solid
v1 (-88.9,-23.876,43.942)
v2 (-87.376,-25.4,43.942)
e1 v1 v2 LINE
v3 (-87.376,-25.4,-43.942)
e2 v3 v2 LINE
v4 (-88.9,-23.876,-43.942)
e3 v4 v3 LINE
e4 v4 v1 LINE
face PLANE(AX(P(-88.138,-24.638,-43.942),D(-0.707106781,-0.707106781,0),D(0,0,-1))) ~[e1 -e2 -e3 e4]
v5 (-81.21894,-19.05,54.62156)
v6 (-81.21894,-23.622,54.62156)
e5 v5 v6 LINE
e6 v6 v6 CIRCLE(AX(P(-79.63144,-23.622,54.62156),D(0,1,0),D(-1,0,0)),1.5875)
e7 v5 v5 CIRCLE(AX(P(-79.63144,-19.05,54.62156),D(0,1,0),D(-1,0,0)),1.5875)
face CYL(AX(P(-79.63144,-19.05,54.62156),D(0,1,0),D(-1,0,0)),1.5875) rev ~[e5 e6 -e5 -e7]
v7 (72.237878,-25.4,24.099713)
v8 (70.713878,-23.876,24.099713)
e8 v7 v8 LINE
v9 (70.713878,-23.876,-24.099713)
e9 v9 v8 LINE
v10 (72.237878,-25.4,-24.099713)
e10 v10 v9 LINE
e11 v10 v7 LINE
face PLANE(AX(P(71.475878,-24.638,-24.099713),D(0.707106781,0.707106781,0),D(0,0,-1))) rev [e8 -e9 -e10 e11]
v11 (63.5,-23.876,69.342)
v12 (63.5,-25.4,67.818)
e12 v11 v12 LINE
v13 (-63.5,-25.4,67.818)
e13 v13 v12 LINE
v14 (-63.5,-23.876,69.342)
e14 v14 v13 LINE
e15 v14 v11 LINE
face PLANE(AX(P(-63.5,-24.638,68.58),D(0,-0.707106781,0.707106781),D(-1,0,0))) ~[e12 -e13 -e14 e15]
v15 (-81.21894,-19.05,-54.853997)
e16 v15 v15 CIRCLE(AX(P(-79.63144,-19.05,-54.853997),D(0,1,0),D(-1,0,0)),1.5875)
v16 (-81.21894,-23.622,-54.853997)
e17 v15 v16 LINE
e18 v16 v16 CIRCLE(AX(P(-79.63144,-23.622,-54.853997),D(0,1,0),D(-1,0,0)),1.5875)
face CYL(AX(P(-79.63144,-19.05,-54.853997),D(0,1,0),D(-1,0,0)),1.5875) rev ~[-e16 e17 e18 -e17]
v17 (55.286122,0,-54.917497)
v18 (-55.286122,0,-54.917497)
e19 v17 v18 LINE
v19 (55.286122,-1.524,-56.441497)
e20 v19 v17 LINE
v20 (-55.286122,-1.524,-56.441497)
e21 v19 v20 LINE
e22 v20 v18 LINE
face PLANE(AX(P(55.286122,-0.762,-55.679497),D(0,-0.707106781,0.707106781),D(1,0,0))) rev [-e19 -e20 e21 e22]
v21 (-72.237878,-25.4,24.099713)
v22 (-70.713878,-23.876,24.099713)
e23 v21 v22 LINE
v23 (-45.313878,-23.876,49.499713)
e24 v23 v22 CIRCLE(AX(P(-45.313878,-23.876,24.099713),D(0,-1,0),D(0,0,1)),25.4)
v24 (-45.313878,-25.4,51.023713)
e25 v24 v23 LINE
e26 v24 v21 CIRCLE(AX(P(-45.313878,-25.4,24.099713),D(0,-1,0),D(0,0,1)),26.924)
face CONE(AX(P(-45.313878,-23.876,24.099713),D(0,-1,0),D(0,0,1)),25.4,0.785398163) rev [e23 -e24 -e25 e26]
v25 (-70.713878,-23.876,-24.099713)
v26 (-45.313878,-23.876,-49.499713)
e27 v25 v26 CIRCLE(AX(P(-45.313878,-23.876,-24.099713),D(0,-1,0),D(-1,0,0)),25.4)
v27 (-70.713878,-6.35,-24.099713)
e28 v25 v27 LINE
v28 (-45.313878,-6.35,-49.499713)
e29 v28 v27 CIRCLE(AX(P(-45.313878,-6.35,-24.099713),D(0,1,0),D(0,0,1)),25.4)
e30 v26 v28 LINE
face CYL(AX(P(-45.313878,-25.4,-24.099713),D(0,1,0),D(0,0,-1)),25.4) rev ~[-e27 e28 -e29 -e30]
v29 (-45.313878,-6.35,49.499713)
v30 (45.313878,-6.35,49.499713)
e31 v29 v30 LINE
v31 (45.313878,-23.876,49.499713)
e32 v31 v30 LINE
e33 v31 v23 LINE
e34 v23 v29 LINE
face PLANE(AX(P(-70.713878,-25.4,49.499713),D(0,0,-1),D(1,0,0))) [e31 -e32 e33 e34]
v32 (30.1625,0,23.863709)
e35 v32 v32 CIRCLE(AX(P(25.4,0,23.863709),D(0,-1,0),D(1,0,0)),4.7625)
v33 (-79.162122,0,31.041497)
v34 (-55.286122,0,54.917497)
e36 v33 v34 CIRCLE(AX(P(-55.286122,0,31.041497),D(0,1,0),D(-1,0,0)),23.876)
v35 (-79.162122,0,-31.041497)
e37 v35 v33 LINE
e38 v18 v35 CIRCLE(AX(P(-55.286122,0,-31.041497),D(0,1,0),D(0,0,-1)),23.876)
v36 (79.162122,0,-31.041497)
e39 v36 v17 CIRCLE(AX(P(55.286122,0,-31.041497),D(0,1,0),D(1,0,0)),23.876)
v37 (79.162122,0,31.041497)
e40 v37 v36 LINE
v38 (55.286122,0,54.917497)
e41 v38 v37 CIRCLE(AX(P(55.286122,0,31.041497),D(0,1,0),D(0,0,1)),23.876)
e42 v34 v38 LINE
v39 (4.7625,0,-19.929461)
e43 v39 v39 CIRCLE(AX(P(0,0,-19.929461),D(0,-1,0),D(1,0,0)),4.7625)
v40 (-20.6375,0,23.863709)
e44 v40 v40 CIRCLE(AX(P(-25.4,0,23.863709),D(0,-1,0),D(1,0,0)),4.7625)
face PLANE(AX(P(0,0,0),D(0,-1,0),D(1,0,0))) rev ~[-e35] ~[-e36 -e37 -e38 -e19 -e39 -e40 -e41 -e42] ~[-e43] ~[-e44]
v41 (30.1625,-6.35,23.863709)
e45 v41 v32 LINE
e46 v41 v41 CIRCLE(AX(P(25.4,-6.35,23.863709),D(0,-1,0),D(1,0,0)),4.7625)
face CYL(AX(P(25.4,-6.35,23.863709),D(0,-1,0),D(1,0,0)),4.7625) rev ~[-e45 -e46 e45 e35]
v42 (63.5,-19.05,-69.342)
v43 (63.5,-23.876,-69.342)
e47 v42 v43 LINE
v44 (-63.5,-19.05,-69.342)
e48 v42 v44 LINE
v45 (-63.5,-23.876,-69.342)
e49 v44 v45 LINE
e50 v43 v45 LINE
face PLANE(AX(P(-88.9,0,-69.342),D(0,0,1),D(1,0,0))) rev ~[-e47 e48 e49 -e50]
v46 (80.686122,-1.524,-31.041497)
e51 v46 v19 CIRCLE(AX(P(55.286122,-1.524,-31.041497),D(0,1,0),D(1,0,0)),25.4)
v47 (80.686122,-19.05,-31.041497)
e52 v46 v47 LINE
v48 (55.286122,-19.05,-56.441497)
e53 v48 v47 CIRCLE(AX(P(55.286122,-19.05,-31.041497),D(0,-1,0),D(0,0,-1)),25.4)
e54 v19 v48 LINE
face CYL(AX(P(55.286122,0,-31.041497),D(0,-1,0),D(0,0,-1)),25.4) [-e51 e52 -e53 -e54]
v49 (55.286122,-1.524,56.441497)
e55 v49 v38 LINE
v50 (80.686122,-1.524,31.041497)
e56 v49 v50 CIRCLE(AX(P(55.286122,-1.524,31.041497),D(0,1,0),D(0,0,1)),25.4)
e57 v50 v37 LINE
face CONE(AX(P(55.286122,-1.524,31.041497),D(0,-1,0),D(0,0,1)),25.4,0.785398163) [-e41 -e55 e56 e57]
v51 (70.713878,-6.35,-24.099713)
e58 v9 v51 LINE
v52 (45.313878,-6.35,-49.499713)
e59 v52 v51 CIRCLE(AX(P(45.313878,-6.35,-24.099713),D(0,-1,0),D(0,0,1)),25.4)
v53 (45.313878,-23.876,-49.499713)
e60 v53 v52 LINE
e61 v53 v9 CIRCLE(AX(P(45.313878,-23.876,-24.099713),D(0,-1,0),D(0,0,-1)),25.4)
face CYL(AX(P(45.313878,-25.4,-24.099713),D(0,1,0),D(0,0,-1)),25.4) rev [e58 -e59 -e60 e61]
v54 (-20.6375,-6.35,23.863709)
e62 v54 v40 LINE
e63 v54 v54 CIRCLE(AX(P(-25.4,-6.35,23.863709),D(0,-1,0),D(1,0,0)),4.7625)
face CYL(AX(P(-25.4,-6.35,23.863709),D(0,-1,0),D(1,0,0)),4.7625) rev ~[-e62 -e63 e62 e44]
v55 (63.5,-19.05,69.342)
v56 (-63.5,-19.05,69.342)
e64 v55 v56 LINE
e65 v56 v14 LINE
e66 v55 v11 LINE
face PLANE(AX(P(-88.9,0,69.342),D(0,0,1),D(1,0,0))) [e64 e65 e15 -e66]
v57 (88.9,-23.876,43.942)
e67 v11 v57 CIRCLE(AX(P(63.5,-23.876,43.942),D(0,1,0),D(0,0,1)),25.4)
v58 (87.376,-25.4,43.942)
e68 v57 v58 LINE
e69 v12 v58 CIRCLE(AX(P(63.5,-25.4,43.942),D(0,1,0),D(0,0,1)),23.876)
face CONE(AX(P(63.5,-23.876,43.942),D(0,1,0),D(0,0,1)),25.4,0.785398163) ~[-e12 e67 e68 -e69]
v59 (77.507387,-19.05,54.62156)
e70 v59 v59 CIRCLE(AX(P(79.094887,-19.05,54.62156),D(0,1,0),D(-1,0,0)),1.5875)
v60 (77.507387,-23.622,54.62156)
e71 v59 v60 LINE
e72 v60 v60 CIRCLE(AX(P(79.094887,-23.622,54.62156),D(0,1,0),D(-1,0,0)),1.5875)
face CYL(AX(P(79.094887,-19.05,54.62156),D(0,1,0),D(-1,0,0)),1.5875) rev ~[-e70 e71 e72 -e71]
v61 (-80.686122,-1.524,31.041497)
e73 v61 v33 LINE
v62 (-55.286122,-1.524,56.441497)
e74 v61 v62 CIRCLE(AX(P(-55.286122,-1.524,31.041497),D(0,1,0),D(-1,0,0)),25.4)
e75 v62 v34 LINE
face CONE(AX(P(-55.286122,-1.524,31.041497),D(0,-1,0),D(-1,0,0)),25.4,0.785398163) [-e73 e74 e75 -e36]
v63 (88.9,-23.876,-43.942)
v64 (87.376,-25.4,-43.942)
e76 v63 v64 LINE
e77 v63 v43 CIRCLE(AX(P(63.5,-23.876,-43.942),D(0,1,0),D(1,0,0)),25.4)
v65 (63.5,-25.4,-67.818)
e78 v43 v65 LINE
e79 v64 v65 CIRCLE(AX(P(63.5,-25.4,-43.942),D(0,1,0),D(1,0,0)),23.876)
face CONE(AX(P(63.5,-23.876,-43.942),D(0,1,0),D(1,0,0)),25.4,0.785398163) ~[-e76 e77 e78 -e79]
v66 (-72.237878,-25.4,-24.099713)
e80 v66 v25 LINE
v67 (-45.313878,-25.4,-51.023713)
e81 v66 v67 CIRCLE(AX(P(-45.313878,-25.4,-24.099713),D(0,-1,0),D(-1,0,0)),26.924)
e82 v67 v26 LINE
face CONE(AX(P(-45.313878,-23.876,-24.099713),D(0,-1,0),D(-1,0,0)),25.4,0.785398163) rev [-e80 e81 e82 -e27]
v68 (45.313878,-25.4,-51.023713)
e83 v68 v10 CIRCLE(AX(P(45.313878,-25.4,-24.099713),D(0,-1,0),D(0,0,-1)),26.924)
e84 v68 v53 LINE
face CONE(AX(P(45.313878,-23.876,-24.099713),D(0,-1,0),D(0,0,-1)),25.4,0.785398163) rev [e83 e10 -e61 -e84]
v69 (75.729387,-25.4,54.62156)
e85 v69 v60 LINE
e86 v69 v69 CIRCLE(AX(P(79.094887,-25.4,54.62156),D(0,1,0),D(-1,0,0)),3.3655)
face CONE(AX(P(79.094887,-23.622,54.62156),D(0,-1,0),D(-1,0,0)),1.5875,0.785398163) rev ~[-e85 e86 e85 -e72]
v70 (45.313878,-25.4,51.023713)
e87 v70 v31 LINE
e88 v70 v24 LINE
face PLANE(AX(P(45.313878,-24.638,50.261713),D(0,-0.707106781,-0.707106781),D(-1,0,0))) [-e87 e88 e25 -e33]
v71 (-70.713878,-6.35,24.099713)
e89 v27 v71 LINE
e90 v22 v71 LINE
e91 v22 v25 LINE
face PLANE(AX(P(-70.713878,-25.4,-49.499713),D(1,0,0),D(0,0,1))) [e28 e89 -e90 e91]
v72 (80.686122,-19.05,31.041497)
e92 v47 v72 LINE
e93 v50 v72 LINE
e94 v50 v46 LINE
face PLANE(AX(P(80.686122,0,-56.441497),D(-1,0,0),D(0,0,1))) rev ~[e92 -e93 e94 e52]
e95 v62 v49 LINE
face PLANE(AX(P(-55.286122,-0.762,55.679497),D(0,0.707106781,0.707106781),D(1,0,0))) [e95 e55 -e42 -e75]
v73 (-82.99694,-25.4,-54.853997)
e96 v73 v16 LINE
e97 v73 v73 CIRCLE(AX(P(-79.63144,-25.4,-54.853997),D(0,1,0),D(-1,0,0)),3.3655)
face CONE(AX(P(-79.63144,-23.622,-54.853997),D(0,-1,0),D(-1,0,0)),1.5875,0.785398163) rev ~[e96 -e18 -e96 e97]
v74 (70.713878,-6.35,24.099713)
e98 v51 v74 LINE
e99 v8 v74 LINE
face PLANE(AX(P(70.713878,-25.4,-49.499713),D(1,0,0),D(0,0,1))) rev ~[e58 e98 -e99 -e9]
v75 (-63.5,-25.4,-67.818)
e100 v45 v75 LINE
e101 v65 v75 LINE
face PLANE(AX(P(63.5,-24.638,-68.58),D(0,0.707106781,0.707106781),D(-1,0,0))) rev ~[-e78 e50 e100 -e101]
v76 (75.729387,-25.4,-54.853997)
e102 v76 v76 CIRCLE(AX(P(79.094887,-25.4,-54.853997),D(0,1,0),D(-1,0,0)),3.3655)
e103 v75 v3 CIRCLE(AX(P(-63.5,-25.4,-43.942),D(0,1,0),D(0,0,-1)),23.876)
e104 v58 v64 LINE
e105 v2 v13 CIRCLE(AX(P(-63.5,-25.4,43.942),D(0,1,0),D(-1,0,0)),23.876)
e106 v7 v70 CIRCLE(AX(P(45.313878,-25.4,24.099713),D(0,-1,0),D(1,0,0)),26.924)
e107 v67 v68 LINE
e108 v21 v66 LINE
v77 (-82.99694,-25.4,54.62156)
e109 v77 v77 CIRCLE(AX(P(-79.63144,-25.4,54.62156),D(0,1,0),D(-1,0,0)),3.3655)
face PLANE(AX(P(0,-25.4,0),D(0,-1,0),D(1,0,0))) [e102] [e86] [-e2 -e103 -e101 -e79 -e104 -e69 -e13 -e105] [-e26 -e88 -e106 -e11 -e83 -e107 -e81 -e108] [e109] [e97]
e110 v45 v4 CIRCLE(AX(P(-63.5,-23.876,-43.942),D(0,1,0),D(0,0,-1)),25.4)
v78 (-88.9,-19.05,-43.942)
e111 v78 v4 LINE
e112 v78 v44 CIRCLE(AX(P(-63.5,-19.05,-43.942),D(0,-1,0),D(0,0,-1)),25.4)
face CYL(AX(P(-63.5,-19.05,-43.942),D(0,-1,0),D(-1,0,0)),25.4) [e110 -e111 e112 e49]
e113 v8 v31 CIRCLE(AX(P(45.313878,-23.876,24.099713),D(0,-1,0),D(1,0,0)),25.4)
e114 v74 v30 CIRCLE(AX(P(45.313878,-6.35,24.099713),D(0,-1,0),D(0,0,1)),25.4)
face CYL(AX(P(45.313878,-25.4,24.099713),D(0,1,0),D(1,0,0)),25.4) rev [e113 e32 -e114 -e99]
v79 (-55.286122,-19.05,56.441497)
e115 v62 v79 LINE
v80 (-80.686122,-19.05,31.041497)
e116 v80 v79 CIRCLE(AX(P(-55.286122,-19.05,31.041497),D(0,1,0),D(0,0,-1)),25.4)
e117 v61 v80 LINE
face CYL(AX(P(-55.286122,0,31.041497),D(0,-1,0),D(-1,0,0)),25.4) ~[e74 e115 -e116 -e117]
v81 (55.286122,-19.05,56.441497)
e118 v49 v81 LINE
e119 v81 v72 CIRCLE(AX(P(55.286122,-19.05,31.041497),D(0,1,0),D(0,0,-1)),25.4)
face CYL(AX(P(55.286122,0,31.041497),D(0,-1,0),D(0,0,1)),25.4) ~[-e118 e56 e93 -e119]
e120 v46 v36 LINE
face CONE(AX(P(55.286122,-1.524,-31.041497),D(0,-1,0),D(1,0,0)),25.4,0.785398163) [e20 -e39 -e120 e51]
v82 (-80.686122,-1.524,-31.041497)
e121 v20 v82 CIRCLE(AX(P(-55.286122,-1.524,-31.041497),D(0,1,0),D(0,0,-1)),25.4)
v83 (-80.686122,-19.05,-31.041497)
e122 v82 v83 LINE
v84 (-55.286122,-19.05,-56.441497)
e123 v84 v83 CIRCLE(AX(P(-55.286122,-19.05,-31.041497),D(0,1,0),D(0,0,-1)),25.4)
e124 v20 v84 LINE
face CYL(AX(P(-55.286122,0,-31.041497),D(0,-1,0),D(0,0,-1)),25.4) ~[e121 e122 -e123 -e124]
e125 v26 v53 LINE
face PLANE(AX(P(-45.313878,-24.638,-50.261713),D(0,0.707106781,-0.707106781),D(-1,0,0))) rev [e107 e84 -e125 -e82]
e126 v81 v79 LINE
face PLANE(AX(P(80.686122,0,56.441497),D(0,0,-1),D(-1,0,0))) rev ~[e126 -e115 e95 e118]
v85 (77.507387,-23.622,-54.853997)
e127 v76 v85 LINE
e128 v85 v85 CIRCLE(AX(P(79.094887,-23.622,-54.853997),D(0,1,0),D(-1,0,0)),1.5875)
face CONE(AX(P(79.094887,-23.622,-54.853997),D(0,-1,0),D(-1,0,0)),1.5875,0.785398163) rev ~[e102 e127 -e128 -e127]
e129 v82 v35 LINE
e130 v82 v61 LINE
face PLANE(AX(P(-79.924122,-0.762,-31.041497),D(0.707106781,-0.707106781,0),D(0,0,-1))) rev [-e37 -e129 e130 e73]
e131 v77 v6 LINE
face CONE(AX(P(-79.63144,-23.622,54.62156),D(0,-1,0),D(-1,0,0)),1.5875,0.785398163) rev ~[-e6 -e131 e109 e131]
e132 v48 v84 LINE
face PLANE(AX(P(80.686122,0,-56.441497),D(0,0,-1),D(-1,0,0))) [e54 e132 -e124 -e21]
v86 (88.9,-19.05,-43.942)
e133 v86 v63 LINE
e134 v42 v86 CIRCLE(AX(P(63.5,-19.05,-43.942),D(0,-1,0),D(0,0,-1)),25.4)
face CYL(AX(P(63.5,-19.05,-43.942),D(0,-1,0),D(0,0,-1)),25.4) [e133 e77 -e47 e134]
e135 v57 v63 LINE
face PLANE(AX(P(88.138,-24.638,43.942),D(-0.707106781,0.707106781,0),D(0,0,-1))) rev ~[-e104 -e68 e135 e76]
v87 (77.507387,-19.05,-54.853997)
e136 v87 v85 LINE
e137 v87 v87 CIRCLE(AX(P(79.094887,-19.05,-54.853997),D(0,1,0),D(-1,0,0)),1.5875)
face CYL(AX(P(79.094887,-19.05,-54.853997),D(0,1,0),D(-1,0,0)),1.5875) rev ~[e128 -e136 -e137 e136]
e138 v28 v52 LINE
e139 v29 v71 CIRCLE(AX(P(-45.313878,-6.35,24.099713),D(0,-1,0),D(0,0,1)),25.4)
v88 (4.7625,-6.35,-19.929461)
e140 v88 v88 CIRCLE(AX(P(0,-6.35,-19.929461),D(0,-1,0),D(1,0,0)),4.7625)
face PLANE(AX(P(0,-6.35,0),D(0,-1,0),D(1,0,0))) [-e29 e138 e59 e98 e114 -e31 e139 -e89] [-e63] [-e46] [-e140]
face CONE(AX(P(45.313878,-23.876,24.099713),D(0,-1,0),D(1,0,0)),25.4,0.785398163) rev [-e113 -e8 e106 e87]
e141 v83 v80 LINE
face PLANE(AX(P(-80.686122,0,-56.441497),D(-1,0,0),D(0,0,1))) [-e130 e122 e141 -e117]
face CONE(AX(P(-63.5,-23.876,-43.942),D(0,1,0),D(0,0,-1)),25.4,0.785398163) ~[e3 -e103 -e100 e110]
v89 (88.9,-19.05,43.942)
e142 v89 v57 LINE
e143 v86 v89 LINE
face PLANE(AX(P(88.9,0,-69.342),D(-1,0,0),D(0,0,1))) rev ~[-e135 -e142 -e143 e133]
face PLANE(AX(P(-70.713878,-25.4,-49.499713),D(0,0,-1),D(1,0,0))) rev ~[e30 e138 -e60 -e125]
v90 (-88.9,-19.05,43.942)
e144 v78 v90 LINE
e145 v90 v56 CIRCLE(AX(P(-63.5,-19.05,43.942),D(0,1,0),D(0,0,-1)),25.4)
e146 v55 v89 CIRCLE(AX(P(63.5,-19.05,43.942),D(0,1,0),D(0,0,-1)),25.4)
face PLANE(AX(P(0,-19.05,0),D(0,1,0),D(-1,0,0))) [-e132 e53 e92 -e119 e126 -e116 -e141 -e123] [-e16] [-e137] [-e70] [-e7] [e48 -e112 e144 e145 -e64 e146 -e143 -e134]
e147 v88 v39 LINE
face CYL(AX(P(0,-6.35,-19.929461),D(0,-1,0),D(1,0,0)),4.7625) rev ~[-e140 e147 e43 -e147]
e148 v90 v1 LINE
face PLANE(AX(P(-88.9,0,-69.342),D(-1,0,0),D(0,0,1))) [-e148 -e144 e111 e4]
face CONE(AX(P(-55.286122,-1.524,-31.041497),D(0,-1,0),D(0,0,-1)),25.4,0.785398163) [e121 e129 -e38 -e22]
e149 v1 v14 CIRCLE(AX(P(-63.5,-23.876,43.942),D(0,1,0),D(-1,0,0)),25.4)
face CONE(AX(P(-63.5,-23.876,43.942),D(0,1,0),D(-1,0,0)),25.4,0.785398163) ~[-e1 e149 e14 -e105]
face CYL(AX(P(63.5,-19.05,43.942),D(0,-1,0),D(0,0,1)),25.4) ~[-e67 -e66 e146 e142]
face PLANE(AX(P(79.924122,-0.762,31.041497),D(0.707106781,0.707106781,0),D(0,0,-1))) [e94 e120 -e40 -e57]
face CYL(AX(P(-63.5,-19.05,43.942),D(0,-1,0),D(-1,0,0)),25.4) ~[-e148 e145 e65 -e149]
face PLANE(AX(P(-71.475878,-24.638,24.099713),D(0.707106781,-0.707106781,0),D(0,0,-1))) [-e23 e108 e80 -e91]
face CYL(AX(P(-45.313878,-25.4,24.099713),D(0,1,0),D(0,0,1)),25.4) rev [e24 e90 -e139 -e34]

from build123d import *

# Parameters (mm, degrees)
F0_W      = 177.8
F0_H      = 138.684
F1_DEPTH  = 25.4
F2_W      = 177.8
F2_H      = 138.684
F2_W_2    = 161.3722443581
F2_H_2    = 112.8829941154
F3_DEPTH  = 19.05
F4_W      = 141.4277553558
F4_H      = 98.9994257689
F5_DEPTH  = 19.05
F6_R      = 25.4
F7_R      = 4.7625
F8_DEPTH  = 6.351
F9_SIZE   = 1.524
F10_R     = 1.5875
F11_DEPTH = 6.351
F12_SIZE  = 1.778


with BuildPart() as f1:
    # F0 (on Front) → F1 (new body)
    with BuildSketch(Plane.XZ):
        Rectangle(F0_W, F0_H)
    extrude(amount=F1_DEPTH)

    # F2 (on face) → F3 (cut)
    with BuildSketch(Plane(origin=(0, 0, 0), x_dir=(-1, 0, 0), z_dir=(0, 1, 0))):
        Rectangle(F2_W, F2_H)
        Rectangle(F2_W_2, F2_H_2, mode=Mode.SUBTRACT)
    extrude(amount=-F3_DEPTH, mode=Mode.SUBTRACT)

    # F4 (on face) → F5 (cut)
    with BuildSketch(Plane.XZ.offset(25.4)):
        Rectangle(F4_W, F4_H)
    extrude(amount=-F5_DEPTH, mode=Mode.SUBTRACT)

    # F6
    f6_edges = [f1.edges().sort_by_distance(p)[0] for p in [
        (88.9, -22.225, 69.342),
        (88.9, -22.225, -69.342),
        (-88.9, -22.225, -69.342),
        (-88.9, -22.225, 69.342),
        (-70.713878, -15.875, 49.499713),
        (70.713878, -15.875, 49.499713),
        (70.713878, -15.875, -49.499713),
        (-70.713878, -15.875, -49.499713),
        (80.686122, -9.525, -56.441497),
        (80.686122, -9.525, 56.441497),
        (-80.686122, -9.525, -56.441497),
        (-80.686122, -9.525, 56.441497),
    ]]
    fillet(f6_edges, radius=F6_R)

    # F7 (on face) → F8 (cut, through all)
    with BuildSketch(Plane.XZ.offset(6.35)):
        with Locations((-25.4, 23.863709036)):
            Circle(F7_R)
        with Locations((25.4, 23.863709036)):
            Circle(F7_R)
        with Locations((0, -19.9294611812)):
            Circle(F7_R)
    extrude(amount=-F8_DEPTH, mode=Mode.SUBTRACT)

    # F9
    f9_edges = [f1.edges().sort_by_distance(p)[0] for p in [
        (0, -25.4, -49.499713),
        (70.713878, -25.4, 0),
        (-88.9, -25.4, 0),
        (-81.460512, -25.4, -61.902512),
        (0, 0, -56.441497),
        (88.9, -25.4, 0),
        (81.460512, -25.4, 61.902512),
        (81.460512, -25.4, -61.902512),
        (0, -25.4, -69.342),
        (0, -25.4, 69.342),
        (-81.460512, -25.4, 61.902512),
        (-63.27439, -25.4, -42.060225),
        (63.27439, -25.4, -42.060225),
        (-70.713878, -25.4, 0),
        (-63.27439, -25.4, 42.060225),
        (63.27439, -25.4, 42.060225),
        (0, -25.4, 49.499713),
        (-80.686122, 0, 0),
        (-73.246634, 0, 49.002009),
        (-73.246634, 0, -49.002009),
        (0, 0, 56.441497),
        (73.246634, 0, 49.002009),
        (73.246634, 0, -49.002009),
        (80.686122, 0, 0),
    ]]
    chamfer(f9_edges, length=F9_SIZE)

    # F10 (on face) → F11 (cut, through all)
    with BuildSketch(Plane(origin=(0, -19.05, 0), x_dir=(-1, 0, 0), z_dir=(0, 1, 0))):
        with Locations((-79.0948867798, 54.6215597034)):
            Circle(F10_R)
        with Locations((79.6314403415, 54.6215597034)):
            Circle(F10_R)
        with Locations((79.6314403415, -54.8539970577)):
            Circle(F10_R)
        with Locations((-79.0948867798, -54.8539970577)):
            Circle(F10_R)
    extrude(amount=-F11_DEPTH, mode=Mode.SUBTRACT)

    # F12
    f12_edges = [f1.edges().sort_by_distance(p)[0] for p in [
        (-78.04394, -25.4, 54.62156),
        (80.682387, -25.4, 54.62156),
        (80.682387, -25.4, -54.853997),
        (-78.04394, -25.4, -54.853997),
    ]]
    chamfer(f12_edges, length=F12_SIZE)


solid = f1.part
